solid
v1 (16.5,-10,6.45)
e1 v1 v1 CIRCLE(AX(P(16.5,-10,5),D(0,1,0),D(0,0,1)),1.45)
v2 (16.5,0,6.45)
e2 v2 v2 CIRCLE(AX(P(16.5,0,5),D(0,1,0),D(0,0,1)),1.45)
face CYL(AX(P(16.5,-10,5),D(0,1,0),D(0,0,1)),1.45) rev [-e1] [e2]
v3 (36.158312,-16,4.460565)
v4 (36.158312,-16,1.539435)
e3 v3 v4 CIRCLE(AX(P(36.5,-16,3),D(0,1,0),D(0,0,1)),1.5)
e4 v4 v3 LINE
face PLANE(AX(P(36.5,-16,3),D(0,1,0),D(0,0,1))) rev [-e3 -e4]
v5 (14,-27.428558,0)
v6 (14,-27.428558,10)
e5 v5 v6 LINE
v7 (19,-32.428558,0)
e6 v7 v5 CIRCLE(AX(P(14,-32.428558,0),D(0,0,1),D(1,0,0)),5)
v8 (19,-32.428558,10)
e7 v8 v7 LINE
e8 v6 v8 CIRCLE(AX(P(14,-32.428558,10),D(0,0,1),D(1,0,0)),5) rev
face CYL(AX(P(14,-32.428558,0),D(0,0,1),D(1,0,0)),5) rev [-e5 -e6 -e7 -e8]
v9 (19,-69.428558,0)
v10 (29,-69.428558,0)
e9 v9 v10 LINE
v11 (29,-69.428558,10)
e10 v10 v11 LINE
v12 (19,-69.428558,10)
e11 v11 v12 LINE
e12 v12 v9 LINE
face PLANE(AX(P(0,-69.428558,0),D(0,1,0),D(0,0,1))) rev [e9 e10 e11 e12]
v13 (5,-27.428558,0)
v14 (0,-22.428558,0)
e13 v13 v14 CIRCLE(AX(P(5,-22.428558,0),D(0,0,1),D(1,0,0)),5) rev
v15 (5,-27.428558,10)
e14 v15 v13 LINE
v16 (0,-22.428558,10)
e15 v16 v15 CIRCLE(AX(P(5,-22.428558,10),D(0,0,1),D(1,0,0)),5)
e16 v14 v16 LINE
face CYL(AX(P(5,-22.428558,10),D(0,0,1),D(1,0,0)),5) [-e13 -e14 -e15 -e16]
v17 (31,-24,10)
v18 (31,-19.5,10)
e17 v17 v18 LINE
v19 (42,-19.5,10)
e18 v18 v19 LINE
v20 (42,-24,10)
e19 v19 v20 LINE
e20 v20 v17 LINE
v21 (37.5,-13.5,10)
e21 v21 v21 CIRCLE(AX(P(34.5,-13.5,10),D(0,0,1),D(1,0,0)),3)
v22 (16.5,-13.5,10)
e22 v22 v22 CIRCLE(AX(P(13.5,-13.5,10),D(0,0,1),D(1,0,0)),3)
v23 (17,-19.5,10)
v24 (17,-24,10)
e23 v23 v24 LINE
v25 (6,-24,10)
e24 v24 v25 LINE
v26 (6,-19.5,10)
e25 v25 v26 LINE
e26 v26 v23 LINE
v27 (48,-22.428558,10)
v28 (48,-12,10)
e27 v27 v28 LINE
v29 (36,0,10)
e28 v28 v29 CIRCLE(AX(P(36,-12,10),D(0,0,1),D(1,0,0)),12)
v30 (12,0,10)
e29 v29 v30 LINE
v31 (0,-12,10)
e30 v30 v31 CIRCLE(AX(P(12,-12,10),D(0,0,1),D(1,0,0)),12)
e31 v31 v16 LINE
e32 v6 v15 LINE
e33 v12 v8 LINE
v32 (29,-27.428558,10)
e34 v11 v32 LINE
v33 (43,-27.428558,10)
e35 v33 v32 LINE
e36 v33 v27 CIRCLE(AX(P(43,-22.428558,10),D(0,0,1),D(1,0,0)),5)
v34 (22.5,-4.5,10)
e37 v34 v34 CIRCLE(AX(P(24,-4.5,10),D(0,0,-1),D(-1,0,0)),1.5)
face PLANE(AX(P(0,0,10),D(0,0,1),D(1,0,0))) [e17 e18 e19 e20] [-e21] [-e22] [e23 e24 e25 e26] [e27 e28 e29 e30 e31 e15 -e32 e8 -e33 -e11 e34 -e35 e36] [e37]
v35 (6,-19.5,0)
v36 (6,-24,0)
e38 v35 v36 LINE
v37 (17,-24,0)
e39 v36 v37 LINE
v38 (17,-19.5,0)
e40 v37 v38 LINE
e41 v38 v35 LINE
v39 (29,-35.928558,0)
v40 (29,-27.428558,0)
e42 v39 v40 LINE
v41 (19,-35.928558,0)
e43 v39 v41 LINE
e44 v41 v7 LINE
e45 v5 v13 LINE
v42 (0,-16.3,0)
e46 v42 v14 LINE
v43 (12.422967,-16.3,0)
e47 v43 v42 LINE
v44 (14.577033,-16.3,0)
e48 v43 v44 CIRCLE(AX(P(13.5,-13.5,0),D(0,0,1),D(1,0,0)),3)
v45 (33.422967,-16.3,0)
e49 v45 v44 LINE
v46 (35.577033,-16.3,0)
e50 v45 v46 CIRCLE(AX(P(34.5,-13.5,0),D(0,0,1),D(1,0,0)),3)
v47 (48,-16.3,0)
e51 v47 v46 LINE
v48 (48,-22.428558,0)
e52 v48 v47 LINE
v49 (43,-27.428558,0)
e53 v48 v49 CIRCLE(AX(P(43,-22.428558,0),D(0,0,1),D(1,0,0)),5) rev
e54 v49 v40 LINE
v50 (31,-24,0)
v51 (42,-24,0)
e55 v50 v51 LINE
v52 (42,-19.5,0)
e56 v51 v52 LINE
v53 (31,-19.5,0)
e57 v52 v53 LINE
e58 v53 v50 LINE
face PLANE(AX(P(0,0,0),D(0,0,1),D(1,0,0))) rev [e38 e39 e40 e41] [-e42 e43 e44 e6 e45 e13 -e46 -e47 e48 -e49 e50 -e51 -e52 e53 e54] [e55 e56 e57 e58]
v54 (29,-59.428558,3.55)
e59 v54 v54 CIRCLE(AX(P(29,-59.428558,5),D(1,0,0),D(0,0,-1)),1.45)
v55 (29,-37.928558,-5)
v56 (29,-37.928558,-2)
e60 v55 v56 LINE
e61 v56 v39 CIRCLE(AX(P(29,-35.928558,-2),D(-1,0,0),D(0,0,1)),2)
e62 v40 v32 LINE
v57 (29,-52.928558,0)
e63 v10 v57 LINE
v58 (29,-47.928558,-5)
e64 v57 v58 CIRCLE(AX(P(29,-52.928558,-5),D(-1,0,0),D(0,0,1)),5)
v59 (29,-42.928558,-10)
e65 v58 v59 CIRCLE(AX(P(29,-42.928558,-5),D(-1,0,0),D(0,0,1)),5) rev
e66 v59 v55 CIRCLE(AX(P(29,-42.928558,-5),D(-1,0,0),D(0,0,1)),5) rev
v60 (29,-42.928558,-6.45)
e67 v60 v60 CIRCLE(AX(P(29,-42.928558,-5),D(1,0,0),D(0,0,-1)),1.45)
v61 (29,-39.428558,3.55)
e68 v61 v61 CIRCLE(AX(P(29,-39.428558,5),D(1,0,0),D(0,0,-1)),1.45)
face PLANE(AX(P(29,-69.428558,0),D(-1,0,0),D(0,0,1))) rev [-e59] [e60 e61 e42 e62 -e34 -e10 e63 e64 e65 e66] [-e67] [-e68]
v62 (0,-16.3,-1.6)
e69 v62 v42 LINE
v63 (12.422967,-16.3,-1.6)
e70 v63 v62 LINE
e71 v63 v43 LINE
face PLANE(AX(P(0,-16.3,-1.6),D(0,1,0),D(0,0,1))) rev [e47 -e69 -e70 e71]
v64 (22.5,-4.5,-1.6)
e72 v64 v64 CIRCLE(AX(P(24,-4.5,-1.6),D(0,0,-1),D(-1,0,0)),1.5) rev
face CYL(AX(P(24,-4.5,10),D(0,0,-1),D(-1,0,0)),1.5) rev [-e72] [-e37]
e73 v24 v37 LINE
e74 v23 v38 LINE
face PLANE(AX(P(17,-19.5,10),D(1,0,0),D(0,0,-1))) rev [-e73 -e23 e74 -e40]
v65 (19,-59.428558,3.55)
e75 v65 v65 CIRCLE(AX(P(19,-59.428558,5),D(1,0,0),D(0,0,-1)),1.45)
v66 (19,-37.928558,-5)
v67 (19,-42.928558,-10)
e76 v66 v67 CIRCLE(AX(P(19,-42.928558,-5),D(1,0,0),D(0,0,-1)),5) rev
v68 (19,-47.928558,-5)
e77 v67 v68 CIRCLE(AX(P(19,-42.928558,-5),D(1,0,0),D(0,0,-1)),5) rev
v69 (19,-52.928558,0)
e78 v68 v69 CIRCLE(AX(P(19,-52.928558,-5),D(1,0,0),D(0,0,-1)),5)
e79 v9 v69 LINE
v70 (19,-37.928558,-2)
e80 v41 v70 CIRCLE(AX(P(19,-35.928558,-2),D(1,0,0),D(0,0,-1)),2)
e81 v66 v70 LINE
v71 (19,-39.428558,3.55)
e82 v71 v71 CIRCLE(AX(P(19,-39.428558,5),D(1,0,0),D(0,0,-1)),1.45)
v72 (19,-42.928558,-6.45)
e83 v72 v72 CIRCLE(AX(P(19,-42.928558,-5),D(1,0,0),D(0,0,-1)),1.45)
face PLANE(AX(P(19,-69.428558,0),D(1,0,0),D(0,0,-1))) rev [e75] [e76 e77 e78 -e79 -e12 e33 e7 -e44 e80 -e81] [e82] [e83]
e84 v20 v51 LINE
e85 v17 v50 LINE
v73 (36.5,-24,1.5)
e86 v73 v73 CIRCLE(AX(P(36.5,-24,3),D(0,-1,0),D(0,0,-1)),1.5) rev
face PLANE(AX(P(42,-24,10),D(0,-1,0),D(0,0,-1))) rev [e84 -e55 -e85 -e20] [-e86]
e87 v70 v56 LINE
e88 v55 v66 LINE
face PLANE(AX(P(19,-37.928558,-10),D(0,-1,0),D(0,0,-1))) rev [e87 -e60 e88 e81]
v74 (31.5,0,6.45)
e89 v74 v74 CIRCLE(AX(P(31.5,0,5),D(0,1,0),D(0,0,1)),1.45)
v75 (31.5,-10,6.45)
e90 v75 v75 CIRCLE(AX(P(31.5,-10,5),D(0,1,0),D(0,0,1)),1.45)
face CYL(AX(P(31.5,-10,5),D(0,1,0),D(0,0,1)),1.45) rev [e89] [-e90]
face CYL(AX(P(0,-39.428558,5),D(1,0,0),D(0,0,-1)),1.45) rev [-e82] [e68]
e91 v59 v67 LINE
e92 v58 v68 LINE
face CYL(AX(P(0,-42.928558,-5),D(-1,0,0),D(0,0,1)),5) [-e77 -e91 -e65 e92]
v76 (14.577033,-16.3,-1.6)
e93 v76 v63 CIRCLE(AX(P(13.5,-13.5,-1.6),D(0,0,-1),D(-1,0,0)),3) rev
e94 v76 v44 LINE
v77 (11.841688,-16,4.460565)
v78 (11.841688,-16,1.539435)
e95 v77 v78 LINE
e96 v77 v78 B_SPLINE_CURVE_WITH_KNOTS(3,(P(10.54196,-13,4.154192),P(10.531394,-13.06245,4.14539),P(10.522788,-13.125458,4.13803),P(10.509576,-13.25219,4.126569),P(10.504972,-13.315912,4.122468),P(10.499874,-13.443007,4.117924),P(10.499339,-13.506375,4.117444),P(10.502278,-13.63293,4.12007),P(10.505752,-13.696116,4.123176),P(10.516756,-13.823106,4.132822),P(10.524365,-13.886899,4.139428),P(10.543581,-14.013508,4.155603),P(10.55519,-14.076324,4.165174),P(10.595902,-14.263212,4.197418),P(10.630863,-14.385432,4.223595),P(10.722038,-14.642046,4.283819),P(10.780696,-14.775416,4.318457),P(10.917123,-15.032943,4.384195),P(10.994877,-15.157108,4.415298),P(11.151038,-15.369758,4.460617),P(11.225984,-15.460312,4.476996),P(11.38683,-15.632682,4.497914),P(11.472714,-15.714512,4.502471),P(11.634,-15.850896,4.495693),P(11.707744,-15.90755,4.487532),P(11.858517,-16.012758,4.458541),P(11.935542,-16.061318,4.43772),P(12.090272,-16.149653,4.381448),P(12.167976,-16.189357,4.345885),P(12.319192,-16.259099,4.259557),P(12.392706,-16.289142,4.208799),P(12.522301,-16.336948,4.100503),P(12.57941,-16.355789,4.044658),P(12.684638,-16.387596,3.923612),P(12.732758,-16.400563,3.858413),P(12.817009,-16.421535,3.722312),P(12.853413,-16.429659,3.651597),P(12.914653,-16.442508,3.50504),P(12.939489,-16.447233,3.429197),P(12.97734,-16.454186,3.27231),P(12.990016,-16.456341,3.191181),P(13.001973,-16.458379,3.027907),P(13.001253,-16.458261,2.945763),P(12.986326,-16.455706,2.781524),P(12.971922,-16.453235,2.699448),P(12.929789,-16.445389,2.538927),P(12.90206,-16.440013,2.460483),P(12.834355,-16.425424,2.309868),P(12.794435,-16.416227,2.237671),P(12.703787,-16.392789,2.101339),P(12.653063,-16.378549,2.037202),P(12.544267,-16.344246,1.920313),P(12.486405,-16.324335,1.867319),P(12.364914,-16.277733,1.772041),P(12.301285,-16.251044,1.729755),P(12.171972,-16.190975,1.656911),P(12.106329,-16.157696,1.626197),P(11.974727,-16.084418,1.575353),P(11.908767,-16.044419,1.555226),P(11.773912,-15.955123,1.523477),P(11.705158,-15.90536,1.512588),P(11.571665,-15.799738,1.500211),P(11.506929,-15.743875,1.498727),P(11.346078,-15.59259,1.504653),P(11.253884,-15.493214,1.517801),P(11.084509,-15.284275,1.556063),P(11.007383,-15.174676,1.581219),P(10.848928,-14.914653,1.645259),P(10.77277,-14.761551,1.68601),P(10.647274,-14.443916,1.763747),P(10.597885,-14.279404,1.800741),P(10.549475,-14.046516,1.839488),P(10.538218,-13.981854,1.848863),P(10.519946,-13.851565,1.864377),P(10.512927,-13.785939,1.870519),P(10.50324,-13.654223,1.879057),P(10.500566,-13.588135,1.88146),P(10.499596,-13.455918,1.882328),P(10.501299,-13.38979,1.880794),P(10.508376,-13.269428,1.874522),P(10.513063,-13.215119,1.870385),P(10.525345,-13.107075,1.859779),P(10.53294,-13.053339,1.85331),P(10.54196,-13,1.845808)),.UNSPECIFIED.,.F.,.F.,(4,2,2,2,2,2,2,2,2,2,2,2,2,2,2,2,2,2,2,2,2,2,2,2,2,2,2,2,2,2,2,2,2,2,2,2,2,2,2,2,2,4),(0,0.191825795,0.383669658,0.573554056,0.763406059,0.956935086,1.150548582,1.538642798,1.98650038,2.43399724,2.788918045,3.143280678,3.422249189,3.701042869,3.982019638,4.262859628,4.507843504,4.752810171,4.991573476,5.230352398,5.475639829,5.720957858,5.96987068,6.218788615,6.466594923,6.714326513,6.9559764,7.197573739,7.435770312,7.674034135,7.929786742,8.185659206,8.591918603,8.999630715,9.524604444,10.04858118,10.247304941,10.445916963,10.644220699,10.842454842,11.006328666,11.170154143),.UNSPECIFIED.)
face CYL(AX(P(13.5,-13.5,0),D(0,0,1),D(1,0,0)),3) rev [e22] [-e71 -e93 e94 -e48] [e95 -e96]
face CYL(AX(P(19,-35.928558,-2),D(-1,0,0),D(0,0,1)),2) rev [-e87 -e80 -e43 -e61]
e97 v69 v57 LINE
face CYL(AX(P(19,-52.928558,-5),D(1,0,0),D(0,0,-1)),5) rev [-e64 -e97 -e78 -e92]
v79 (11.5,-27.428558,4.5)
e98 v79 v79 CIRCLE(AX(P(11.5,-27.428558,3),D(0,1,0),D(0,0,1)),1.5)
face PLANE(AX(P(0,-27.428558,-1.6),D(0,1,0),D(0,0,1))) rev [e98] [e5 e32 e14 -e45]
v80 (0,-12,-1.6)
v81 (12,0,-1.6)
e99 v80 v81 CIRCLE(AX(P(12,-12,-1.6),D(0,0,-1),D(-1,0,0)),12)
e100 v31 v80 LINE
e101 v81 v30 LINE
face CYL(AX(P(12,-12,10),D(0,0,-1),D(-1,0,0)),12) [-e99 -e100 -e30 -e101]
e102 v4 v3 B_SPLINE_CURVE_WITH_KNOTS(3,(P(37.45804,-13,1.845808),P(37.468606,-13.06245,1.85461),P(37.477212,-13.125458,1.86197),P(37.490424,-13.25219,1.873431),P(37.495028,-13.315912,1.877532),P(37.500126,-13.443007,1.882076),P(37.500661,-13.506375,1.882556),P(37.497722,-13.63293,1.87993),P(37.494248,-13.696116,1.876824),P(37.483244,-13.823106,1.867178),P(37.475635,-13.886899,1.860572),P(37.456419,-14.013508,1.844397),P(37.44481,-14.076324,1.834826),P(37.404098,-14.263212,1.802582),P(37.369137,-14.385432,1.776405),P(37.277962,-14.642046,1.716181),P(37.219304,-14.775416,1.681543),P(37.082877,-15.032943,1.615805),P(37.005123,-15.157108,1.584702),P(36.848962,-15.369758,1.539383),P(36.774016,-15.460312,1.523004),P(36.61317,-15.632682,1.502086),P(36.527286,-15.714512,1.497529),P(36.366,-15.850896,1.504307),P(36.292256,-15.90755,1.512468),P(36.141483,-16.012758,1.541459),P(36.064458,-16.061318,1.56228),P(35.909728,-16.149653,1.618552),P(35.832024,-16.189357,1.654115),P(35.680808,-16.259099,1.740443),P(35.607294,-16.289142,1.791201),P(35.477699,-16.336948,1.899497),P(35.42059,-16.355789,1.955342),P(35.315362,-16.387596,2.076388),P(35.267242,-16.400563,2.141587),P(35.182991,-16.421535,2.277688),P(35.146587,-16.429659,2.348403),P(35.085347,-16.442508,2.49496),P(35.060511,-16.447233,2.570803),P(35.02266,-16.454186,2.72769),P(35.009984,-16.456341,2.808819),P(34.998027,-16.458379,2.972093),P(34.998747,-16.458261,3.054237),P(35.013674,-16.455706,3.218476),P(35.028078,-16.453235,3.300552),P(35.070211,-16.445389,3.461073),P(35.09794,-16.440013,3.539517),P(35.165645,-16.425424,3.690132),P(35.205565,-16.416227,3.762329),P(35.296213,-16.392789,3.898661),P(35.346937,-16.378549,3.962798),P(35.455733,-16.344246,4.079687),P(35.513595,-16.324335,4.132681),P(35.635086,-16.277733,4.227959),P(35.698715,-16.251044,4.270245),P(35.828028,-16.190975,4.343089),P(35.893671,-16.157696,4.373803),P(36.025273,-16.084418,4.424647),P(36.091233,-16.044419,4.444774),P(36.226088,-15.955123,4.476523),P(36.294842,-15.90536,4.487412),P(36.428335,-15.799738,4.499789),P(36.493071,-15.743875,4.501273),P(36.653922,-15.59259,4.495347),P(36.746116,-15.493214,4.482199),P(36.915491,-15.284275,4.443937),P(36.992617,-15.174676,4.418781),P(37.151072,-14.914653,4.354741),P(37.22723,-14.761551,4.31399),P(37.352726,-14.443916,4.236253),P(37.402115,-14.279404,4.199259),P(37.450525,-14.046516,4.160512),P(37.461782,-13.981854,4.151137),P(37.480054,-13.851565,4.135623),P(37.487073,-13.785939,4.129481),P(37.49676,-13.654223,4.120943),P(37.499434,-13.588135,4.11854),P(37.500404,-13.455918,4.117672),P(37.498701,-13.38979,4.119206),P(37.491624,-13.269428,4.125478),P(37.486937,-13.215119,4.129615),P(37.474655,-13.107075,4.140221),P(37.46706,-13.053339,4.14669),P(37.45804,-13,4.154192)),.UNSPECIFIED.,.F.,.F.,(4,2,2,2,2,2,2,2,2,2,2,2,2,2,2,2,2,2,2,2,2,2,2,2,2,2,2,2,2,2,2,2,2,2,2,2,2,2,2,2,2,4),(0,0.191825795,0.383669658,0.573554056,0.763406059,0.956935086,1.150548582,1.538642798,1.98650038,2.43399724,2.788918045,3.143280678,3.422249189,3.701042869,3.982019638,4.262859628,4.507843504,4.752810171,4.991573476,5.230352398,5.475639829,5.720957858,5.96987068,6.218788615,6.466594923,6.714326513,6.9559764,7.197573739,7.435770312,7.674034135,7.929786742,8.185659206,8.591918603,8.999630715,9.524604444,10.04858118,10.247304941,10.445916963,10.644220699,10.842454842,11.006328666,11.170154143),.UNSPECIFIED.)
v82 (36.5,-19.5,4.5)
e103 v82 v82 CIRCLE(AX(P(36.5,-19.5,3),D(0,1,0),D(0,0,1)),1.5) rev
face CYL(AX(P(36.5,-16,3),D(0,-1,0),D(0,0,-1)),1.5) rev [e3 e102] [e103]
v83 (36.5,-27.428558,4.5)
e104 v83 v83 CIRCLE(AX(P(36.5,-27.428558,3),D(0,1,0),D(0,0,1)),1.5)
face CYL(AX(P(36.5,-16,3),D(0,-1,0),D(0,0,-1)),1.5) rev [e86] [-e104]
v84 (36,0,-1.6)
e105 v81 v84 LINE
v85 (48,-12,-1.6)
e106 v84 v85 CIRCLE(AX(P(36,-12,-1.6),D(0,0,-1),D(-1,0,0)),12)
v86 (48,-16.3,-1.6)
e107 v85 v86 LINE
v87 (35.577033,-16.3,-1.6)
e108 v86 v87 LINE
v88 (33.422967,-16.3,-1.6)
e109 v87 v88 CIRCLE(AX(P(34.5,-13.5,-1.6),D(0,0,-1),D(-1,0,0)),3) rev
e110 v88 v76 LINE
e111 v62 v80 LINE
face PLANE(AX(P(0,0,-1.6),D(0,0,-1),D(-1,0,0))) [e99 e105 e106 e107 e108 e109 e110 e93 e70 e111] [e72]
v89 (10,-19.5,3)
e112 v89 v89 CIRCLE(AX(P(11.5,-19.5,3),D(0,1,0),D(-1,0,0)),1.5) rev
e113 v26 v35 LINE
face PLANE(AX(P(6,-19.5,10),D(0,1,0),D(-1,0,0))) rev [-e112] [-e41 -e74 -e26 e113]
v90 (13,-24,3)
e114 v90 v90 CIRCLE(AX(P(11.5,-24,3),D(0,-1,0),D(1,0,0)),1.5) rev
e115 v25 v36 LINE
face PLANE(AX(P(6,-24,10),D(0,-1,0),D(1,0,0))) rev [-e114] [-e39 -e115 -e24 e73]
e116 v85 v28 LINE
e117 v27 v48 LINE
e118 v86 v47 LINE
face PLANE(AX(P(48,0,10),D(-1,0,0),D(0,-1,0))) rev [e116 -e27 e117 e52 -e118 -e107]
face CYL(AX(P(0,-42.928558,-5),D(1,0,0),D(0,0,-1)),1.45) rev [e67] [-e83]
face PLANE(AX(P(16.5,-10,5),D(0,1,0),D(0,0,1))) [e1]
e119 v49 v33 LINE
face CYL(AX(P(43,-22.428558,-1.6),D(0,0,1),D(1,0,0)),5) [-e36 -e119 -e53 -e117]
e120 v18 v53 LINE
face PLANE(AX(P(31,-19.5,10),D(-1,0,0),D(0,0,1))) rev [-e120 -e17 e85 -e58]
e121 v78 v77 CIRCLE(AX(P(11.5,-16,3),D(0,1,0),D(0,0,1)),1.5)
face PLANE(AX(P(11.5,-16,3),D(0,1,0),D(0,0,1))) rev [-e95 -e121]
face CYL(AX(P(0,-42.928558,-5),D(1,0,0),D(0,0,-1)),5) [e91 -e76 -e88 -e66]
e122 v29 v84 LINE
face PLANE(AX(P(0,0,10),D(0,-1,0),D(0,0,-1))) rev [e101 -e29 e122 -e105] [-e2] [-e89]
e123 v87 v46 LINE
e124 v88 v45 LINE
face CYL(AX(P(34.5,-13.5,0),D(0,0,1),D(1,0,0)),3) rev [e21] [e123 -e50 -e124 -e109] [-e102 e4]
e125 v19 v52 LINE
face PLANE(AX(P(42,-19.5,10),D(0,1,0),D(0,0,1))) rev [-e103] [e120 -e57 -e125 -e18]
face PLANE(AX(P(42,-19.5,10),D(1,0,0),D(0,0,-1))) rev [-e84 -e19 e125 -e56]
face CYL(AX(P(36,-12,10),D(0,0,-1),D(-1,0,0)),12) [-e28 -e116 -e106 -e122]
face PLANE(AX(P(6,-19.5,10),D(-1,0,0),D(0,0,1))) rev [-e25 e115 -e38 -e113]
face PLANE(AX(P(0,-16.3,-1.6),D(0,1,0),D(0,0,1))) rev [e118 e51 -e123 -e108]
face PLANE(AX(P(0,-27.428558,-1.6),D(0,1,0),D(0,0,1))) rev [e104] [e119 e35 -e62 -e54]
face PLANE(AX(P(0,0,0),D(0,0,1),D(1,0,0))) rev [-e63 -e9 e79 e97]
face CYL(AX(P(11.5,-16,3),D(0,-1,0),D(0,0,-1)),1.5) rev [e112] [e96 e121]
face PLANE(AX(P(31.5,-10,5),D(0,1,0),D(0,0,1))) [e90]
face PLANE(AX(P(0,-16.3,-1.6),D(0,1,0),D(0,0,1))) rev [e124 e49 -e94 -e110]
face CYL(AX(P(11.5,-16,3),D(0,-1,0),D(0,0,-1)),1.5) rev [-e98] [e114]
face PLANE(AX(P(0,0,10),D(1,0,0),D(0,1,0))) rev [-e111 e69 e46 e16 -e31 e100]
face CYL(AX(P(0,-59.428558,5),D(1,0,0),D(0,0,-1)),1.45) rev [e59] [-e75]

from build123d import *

# Parameters (mm, degrees)
SKETCH1_W               = 48
SKETCH1_H               = 70
BOSS_EXTRUDE1_DEPTH     = 10
SKETCH2_R               = 3
CUT_EXTRUDE1_DEPTH      = 86.463442477
SKETCH3_W               = 20.6
SKETCH3_H               = 20.6
CUT_EXTRUDE2_DEPTH      = 86.463442477
FILLET1_R               = 12
SKETCH4_R               = 1.5
CUT_EXTRUDE3_DEPTH      = 86.463442477
SKETCH5_R               = 1.45
CUT_EXTRUDE4_DEPTH      = 10
CUT_EXTRUDE5_DEPTH      = 86.463442477
CUT_EXTRUDE5_DEPTH_BACK = 86.463442477
SKETCH7_W               = 11
SKETCH7_H               = 4.5
SKETCH11_W              = 32
SKETCH11_H              = 15
CUT_EXTRUDE6_DEPTH      = 86.463442477
CUT_EXTRUDE7_DEPTH      = 8
CUT_EXTRUDE7_DEPTH_BACK = 5
SKETCH12_R              = 1.5
SKETCH13_R              = 1.5
BOSS_EXTRUDE4_DEPTH     = 1.6
FILLET2_R               = 8
SKETCH14_W              = 48
SKETCH14_H              = 42.571441548
CUT_EXTRUDE8_DEPTH      = 86.665395594
SKETCH15_W              = 10
SKETCH15_H              = 10
BOSS_EXTRUDE5_DEPTH     = 42
SKETCH18_W              = 10
SKETCH18_H              = 10
BOSS_EXTRUDE8_DEPTH     = 10
SKETCH19_R              = 1.45
CUT_EXTRUDE9_DEPTH      = 76.903390772
FILLET3_R               = 5
FILLET4_R               = 5
FILLET5_R               = 2


# Some blends are built 0.0001 mm under size
with BuildPart() as part:
    # Sketch1 → Boss-Extrude1 (new body)
    with BuildSketch(Plane.XY):
        with Locations((24, -35)):
            Rectangle(SKETCH1_W, SKETCH1_H)
    extrude(amount=BOSS_EXTRUDE1_DEPTH)

    # Sketch2 → Cut-Extrude1 (cut, through all)
    with BuildSketch(Plane.XY.offset(10)):
        with Locations((13.5, -13.5)):
            Circle(SKETCH2_R)
        with Locations((34.5, -13.5)):
            Circle(SKETCH2_R)
    extrude(amount=-CUT_EXTRUDE1_DEPTH, mode=Mode.SUBTRACT)

    # Sketch3 → Cut-Extrude2 (cut, through all)
    with BuildSketch(Plane.XY.offset(10)):
        with Locations((24, -48.8)):
            Rectangle(SKETCH3_W, SKETCH3_H)
    extrude(amount=-CUT_EXTRUDE2_DEPTH, mode=Mode.SUBTRACT)

    # Fillet1
    fillet1_edges = [part.edges().sort_by_distance(p)[0] for p in [
        (0, 0, 5),
        (48, 0, 5),
    ]]
    fillet(fillet1_edges, radius=FILLET1_R)

    # Sketch4 → Cut-Extrude3 (cut, through all)
    with BuildSketch(Plane(origin=(0, 0, 0), x_dir=(-1, 0, 0), z_dir=(0, 0, -1))):
        with Locations((-24, -4.5)):
            Circle(SKETCH4_R)
    extrude(amount=-CUT_EXTRUDE3_DEPTH, mode=Mode.SUBTRACT)

    # Sketch5 → Cut-Extrude4 (cut)
    with BuildSketch(Plane(origin=(0, 0, 0), x_dir=(1, 0, 0), z_dir=(0, 1, 0))):
        with Locations(Location((16.5, -5, 0), (0, 0, 270))):
            Circle(SKETCH5_R)
        with Locations(Location((31.5, -5, 0), (0, 0, 270))):
            Circle(SKETCH5_R)
    extrude(amount=-CUT_EXTRUDE4_DEPTH, mode=Mode.SUBTRACT)

    # Sketch7 → Cut-Extrude5 (cut, two sides: drawn at the far end of the back side and taken through both)
    with BuildSketch(Plane(origin=(0, 0, 0), x_dir=(-1, 0, 0), z_dir=(0, 0, -1)).offset(-CUT_EXTRUDE5_DEPTH_BACK)):
        with Locations((-36.5, -21.75)):
            Rectangle(SKETCH7_W, SKETCH7_H)
        with Locations((-11.5, -21.75)):
            Rectangle(SKETCH7_W, SKETCH7_H)
    extrude(amount=CUT_EXTRUDE5_DEPTH + CUT_EXTRUDE5_DEPTH_BACK, mode=Mode.SUBTRACT)

    # Sketch11 → Cut-Extrude6 (cut, through all)
    with BuildSketch(Plane(origin=(0, 0, 0), x_dir=(-1, 0, 0), z_dir=(0, 0, -1))):
        with Locations((-24, -35)):
            Rectangle(SKETCH11_W, SKETCH11_H)
    extrude(amount=-CUT_EXTRUDE6_DEPTH, mode=Mode.SUBTRACT)

    # Sketch12 → Cut-Extrude7 (cut, two sides: drawn at the far end of the back side and taken through both)
    with BuildSketch(Plane(origin=(0, -24, 0), x_dir=(1, 0, 0), z_dir=(0, 1, 0)).offset(-CUT_EXTRUDE7_DEPTH_BACK)):
        with Locations(Location((36.5, -3, 0), (0, 0, 90))):
            Circle(SKETCH12_R)
        with Locations((11.5, -3)):
            Circle(SKETCH12_R)
    extrude(amount=CUT_EXTRUDE7_DEPTH + CUT_EXTRUDE7_DEPTH_BACK, mode=Mode.SUBTRACT)

    # Sketch13 → Boss-Extrude4 (add)
    with BuildSketch(Plane(origin=(0, 0, 0), x_dir=(-1, 0, 0), z_dir=(0, 0, -1))):
        with BuildLine():
            Line((-48, -12), (-48, -16.3))
            Line((-48, -16.3), (-35.577032961, -16.3))
            ThreePointArc((-35.577032961, -16.3), (-36.198367027, -11.027036304), (-31.5, -13.5))
            ThreePointArc((-31.5, -13.5), (-32.027036304, -15.198367027), (-33.422967039, -16.3))
            Line((-33.422967039, -16.3), (-14.577032961, -16.3))
            ThreePointArc((-14.577032961, -16.3), (-15.198367027, -11.027036304), (-10.5, -13.5))
            ThreePointArc((-10.5, -13.5), (-11.027036304, -15.198367027), (-12.422967039, -16.3))
            Line((-12.422967039, -16.3), (0, -16.3))
            Line((0, -16.3), (0, -12))
            ThreePointArc((0, -12), (-3.514718626, -3.514718626), (-12, 0))
            Line((-12, 0), (-36, 0))
            ThreePointArc((-36, 0), (-44.485281374, -3.514718626), (-48, -12))
        make_face()
        with Locations((-24, -4.5)):
            Circle(SKETCH13_R, mode=Mode.SUBTRACT)
    extrude(amount=BOSS_EXTRUDE4_DEPTH)

    # Fillet2
    # the kernel refuses this fillet: 8 mm, written as the material it takes off along each edge
    with BuildSketch(Plane(origin=(13.7, -42.5, -19.155612754), x_dir=(-1, 0, 0), z_dir=(0, 0, 1))) as fillet2_piece_1:
        with BuildLine():
            CenterArc((8, 7.662245102), FILLET2_R, 180, 73.291656284)
            Line((0, 7.662245102), (-0.16, 7.662245102))
            Line((-0.16, 7.662245102), (-0.16, 0))
            Line((-0.16, 0), (0, -0.16))
            ThreePointArc((0, -0.16), (2.85, -0.16), (5.654, -0.153244902))
            Line((5.654, -0.153244902), (5.7, 0))
        make_face()
    extrude(amount=48.311225509, mode=Mode.SUBTRACT)
    with BuildSketch(Plane(origin=(34.3, -42.5, 29.155612754), x_dir=(0, -1, 0), z_dir=(0, 0, -1))) as fillet2_piece_2:
        with BuildLine():
            CenterArc((7.662245102, -8), FILLET2_R, 90, 73.291656284)
            Line((0, -5.7), (-0.153244902, -5.654))
            ThreePointArc((-0.153244902, -5.654), (-0.16, -2.85), (-0.16, 0))
            Line((-0.16, 0), (0, 0.16))
            Line((0, 0.16), (7.662245102, 0.16))
            Line((7.662245102, 0.16), (7.662245102, 0))
        make_face()
    extrude(amount=48.311225509, mode=Mode.SUBTRACT)

    # Sketch14 → Cut-Extrude8 (cut, through all)
    with BuildSketch(Plane.XY.offset(10)):
        with Locations((24, -48.714279226)):
            Rectangle(SKETCH14_W, SKETCH14_H)
    extrude(amount=-CUT_EXTRUDE8_DEPTH, mode=Mode.SUBTRACT)

    # Sketch15 → Boss-Extrude5 (add)
    with BuildSketch(Plane(origin=(0, -27.428558452, 0), x_dir=(-1, 0, 0), z_dir=(0, -1, 0))):
        with Locations((-24, -5)):
            Rectangle(SKETCH15_W, SKETCH15_H)
    extrude(amount=BOSS_EXTRUDE5_DEPTH)

    # Sketch18 → Boss-Extrude8 (add)
    with BuildSketch(Plane(origin=(0, 0, 0), x_dir=(-1, 0, 0), z_dir=(0, 0, -1))):
        with Locations((-24, -42.928558452)):
            Rectangle(SKETCH18_W, SKETCH18_H)
    extrude(amount=BOSS_EXTRUDE8_DEPTH)

    # Sketch19 → Cut-Extrude9 (cut, through all)
    with BuildSketch(Plane(origin=(29, 0, 0), x_dir=(0, 0, -1), z_dir=(1, 0, 0))):
        with Locations((5, -42.928558452)):
            Circle(SKETCH19_R)
        with Locations((-5, -59.428558452)):
            Circle(SKETCH19_R)
        with Locations((-5, -39.428558452)):
            Circle(SKETCH19_R)
    extrude(amount=-CUT_EXTRUDE9_DEPTH, mode=Mode.SUBTRACT)

    # Fillet3
    fillet3_edges = [part.edges().sort_by_distance(p)[0] for p in [
        (48, -27.428558452, 5),
        (0, -27.428558452, 5),
        (19, -27.428558452, 5),
    ]]
    fillet(fillet3_edges, radius=FILLET3_R)

    # Fillet4
    fillet4_edges = [part.edges().sort_by_distance(p)[0] for p in [
        (24, -47.928558452, 0),
        (24, -47.928558452, -10),
        (24, -37.928558452, -10),
    ]]
    fillet(fillet4_edges, radius=FILLET4_R - 0.0001)  # a hair under: the kernel refuses the full size

    # Fillet5
    fillet5_edges = [part.edges().sort_by_distance(p)[0] for p in [
        (24, -37.928558452, 0),
    ]]
    fillet(fillet5_edges, radius=FILLET5_R)


solid = part.part
